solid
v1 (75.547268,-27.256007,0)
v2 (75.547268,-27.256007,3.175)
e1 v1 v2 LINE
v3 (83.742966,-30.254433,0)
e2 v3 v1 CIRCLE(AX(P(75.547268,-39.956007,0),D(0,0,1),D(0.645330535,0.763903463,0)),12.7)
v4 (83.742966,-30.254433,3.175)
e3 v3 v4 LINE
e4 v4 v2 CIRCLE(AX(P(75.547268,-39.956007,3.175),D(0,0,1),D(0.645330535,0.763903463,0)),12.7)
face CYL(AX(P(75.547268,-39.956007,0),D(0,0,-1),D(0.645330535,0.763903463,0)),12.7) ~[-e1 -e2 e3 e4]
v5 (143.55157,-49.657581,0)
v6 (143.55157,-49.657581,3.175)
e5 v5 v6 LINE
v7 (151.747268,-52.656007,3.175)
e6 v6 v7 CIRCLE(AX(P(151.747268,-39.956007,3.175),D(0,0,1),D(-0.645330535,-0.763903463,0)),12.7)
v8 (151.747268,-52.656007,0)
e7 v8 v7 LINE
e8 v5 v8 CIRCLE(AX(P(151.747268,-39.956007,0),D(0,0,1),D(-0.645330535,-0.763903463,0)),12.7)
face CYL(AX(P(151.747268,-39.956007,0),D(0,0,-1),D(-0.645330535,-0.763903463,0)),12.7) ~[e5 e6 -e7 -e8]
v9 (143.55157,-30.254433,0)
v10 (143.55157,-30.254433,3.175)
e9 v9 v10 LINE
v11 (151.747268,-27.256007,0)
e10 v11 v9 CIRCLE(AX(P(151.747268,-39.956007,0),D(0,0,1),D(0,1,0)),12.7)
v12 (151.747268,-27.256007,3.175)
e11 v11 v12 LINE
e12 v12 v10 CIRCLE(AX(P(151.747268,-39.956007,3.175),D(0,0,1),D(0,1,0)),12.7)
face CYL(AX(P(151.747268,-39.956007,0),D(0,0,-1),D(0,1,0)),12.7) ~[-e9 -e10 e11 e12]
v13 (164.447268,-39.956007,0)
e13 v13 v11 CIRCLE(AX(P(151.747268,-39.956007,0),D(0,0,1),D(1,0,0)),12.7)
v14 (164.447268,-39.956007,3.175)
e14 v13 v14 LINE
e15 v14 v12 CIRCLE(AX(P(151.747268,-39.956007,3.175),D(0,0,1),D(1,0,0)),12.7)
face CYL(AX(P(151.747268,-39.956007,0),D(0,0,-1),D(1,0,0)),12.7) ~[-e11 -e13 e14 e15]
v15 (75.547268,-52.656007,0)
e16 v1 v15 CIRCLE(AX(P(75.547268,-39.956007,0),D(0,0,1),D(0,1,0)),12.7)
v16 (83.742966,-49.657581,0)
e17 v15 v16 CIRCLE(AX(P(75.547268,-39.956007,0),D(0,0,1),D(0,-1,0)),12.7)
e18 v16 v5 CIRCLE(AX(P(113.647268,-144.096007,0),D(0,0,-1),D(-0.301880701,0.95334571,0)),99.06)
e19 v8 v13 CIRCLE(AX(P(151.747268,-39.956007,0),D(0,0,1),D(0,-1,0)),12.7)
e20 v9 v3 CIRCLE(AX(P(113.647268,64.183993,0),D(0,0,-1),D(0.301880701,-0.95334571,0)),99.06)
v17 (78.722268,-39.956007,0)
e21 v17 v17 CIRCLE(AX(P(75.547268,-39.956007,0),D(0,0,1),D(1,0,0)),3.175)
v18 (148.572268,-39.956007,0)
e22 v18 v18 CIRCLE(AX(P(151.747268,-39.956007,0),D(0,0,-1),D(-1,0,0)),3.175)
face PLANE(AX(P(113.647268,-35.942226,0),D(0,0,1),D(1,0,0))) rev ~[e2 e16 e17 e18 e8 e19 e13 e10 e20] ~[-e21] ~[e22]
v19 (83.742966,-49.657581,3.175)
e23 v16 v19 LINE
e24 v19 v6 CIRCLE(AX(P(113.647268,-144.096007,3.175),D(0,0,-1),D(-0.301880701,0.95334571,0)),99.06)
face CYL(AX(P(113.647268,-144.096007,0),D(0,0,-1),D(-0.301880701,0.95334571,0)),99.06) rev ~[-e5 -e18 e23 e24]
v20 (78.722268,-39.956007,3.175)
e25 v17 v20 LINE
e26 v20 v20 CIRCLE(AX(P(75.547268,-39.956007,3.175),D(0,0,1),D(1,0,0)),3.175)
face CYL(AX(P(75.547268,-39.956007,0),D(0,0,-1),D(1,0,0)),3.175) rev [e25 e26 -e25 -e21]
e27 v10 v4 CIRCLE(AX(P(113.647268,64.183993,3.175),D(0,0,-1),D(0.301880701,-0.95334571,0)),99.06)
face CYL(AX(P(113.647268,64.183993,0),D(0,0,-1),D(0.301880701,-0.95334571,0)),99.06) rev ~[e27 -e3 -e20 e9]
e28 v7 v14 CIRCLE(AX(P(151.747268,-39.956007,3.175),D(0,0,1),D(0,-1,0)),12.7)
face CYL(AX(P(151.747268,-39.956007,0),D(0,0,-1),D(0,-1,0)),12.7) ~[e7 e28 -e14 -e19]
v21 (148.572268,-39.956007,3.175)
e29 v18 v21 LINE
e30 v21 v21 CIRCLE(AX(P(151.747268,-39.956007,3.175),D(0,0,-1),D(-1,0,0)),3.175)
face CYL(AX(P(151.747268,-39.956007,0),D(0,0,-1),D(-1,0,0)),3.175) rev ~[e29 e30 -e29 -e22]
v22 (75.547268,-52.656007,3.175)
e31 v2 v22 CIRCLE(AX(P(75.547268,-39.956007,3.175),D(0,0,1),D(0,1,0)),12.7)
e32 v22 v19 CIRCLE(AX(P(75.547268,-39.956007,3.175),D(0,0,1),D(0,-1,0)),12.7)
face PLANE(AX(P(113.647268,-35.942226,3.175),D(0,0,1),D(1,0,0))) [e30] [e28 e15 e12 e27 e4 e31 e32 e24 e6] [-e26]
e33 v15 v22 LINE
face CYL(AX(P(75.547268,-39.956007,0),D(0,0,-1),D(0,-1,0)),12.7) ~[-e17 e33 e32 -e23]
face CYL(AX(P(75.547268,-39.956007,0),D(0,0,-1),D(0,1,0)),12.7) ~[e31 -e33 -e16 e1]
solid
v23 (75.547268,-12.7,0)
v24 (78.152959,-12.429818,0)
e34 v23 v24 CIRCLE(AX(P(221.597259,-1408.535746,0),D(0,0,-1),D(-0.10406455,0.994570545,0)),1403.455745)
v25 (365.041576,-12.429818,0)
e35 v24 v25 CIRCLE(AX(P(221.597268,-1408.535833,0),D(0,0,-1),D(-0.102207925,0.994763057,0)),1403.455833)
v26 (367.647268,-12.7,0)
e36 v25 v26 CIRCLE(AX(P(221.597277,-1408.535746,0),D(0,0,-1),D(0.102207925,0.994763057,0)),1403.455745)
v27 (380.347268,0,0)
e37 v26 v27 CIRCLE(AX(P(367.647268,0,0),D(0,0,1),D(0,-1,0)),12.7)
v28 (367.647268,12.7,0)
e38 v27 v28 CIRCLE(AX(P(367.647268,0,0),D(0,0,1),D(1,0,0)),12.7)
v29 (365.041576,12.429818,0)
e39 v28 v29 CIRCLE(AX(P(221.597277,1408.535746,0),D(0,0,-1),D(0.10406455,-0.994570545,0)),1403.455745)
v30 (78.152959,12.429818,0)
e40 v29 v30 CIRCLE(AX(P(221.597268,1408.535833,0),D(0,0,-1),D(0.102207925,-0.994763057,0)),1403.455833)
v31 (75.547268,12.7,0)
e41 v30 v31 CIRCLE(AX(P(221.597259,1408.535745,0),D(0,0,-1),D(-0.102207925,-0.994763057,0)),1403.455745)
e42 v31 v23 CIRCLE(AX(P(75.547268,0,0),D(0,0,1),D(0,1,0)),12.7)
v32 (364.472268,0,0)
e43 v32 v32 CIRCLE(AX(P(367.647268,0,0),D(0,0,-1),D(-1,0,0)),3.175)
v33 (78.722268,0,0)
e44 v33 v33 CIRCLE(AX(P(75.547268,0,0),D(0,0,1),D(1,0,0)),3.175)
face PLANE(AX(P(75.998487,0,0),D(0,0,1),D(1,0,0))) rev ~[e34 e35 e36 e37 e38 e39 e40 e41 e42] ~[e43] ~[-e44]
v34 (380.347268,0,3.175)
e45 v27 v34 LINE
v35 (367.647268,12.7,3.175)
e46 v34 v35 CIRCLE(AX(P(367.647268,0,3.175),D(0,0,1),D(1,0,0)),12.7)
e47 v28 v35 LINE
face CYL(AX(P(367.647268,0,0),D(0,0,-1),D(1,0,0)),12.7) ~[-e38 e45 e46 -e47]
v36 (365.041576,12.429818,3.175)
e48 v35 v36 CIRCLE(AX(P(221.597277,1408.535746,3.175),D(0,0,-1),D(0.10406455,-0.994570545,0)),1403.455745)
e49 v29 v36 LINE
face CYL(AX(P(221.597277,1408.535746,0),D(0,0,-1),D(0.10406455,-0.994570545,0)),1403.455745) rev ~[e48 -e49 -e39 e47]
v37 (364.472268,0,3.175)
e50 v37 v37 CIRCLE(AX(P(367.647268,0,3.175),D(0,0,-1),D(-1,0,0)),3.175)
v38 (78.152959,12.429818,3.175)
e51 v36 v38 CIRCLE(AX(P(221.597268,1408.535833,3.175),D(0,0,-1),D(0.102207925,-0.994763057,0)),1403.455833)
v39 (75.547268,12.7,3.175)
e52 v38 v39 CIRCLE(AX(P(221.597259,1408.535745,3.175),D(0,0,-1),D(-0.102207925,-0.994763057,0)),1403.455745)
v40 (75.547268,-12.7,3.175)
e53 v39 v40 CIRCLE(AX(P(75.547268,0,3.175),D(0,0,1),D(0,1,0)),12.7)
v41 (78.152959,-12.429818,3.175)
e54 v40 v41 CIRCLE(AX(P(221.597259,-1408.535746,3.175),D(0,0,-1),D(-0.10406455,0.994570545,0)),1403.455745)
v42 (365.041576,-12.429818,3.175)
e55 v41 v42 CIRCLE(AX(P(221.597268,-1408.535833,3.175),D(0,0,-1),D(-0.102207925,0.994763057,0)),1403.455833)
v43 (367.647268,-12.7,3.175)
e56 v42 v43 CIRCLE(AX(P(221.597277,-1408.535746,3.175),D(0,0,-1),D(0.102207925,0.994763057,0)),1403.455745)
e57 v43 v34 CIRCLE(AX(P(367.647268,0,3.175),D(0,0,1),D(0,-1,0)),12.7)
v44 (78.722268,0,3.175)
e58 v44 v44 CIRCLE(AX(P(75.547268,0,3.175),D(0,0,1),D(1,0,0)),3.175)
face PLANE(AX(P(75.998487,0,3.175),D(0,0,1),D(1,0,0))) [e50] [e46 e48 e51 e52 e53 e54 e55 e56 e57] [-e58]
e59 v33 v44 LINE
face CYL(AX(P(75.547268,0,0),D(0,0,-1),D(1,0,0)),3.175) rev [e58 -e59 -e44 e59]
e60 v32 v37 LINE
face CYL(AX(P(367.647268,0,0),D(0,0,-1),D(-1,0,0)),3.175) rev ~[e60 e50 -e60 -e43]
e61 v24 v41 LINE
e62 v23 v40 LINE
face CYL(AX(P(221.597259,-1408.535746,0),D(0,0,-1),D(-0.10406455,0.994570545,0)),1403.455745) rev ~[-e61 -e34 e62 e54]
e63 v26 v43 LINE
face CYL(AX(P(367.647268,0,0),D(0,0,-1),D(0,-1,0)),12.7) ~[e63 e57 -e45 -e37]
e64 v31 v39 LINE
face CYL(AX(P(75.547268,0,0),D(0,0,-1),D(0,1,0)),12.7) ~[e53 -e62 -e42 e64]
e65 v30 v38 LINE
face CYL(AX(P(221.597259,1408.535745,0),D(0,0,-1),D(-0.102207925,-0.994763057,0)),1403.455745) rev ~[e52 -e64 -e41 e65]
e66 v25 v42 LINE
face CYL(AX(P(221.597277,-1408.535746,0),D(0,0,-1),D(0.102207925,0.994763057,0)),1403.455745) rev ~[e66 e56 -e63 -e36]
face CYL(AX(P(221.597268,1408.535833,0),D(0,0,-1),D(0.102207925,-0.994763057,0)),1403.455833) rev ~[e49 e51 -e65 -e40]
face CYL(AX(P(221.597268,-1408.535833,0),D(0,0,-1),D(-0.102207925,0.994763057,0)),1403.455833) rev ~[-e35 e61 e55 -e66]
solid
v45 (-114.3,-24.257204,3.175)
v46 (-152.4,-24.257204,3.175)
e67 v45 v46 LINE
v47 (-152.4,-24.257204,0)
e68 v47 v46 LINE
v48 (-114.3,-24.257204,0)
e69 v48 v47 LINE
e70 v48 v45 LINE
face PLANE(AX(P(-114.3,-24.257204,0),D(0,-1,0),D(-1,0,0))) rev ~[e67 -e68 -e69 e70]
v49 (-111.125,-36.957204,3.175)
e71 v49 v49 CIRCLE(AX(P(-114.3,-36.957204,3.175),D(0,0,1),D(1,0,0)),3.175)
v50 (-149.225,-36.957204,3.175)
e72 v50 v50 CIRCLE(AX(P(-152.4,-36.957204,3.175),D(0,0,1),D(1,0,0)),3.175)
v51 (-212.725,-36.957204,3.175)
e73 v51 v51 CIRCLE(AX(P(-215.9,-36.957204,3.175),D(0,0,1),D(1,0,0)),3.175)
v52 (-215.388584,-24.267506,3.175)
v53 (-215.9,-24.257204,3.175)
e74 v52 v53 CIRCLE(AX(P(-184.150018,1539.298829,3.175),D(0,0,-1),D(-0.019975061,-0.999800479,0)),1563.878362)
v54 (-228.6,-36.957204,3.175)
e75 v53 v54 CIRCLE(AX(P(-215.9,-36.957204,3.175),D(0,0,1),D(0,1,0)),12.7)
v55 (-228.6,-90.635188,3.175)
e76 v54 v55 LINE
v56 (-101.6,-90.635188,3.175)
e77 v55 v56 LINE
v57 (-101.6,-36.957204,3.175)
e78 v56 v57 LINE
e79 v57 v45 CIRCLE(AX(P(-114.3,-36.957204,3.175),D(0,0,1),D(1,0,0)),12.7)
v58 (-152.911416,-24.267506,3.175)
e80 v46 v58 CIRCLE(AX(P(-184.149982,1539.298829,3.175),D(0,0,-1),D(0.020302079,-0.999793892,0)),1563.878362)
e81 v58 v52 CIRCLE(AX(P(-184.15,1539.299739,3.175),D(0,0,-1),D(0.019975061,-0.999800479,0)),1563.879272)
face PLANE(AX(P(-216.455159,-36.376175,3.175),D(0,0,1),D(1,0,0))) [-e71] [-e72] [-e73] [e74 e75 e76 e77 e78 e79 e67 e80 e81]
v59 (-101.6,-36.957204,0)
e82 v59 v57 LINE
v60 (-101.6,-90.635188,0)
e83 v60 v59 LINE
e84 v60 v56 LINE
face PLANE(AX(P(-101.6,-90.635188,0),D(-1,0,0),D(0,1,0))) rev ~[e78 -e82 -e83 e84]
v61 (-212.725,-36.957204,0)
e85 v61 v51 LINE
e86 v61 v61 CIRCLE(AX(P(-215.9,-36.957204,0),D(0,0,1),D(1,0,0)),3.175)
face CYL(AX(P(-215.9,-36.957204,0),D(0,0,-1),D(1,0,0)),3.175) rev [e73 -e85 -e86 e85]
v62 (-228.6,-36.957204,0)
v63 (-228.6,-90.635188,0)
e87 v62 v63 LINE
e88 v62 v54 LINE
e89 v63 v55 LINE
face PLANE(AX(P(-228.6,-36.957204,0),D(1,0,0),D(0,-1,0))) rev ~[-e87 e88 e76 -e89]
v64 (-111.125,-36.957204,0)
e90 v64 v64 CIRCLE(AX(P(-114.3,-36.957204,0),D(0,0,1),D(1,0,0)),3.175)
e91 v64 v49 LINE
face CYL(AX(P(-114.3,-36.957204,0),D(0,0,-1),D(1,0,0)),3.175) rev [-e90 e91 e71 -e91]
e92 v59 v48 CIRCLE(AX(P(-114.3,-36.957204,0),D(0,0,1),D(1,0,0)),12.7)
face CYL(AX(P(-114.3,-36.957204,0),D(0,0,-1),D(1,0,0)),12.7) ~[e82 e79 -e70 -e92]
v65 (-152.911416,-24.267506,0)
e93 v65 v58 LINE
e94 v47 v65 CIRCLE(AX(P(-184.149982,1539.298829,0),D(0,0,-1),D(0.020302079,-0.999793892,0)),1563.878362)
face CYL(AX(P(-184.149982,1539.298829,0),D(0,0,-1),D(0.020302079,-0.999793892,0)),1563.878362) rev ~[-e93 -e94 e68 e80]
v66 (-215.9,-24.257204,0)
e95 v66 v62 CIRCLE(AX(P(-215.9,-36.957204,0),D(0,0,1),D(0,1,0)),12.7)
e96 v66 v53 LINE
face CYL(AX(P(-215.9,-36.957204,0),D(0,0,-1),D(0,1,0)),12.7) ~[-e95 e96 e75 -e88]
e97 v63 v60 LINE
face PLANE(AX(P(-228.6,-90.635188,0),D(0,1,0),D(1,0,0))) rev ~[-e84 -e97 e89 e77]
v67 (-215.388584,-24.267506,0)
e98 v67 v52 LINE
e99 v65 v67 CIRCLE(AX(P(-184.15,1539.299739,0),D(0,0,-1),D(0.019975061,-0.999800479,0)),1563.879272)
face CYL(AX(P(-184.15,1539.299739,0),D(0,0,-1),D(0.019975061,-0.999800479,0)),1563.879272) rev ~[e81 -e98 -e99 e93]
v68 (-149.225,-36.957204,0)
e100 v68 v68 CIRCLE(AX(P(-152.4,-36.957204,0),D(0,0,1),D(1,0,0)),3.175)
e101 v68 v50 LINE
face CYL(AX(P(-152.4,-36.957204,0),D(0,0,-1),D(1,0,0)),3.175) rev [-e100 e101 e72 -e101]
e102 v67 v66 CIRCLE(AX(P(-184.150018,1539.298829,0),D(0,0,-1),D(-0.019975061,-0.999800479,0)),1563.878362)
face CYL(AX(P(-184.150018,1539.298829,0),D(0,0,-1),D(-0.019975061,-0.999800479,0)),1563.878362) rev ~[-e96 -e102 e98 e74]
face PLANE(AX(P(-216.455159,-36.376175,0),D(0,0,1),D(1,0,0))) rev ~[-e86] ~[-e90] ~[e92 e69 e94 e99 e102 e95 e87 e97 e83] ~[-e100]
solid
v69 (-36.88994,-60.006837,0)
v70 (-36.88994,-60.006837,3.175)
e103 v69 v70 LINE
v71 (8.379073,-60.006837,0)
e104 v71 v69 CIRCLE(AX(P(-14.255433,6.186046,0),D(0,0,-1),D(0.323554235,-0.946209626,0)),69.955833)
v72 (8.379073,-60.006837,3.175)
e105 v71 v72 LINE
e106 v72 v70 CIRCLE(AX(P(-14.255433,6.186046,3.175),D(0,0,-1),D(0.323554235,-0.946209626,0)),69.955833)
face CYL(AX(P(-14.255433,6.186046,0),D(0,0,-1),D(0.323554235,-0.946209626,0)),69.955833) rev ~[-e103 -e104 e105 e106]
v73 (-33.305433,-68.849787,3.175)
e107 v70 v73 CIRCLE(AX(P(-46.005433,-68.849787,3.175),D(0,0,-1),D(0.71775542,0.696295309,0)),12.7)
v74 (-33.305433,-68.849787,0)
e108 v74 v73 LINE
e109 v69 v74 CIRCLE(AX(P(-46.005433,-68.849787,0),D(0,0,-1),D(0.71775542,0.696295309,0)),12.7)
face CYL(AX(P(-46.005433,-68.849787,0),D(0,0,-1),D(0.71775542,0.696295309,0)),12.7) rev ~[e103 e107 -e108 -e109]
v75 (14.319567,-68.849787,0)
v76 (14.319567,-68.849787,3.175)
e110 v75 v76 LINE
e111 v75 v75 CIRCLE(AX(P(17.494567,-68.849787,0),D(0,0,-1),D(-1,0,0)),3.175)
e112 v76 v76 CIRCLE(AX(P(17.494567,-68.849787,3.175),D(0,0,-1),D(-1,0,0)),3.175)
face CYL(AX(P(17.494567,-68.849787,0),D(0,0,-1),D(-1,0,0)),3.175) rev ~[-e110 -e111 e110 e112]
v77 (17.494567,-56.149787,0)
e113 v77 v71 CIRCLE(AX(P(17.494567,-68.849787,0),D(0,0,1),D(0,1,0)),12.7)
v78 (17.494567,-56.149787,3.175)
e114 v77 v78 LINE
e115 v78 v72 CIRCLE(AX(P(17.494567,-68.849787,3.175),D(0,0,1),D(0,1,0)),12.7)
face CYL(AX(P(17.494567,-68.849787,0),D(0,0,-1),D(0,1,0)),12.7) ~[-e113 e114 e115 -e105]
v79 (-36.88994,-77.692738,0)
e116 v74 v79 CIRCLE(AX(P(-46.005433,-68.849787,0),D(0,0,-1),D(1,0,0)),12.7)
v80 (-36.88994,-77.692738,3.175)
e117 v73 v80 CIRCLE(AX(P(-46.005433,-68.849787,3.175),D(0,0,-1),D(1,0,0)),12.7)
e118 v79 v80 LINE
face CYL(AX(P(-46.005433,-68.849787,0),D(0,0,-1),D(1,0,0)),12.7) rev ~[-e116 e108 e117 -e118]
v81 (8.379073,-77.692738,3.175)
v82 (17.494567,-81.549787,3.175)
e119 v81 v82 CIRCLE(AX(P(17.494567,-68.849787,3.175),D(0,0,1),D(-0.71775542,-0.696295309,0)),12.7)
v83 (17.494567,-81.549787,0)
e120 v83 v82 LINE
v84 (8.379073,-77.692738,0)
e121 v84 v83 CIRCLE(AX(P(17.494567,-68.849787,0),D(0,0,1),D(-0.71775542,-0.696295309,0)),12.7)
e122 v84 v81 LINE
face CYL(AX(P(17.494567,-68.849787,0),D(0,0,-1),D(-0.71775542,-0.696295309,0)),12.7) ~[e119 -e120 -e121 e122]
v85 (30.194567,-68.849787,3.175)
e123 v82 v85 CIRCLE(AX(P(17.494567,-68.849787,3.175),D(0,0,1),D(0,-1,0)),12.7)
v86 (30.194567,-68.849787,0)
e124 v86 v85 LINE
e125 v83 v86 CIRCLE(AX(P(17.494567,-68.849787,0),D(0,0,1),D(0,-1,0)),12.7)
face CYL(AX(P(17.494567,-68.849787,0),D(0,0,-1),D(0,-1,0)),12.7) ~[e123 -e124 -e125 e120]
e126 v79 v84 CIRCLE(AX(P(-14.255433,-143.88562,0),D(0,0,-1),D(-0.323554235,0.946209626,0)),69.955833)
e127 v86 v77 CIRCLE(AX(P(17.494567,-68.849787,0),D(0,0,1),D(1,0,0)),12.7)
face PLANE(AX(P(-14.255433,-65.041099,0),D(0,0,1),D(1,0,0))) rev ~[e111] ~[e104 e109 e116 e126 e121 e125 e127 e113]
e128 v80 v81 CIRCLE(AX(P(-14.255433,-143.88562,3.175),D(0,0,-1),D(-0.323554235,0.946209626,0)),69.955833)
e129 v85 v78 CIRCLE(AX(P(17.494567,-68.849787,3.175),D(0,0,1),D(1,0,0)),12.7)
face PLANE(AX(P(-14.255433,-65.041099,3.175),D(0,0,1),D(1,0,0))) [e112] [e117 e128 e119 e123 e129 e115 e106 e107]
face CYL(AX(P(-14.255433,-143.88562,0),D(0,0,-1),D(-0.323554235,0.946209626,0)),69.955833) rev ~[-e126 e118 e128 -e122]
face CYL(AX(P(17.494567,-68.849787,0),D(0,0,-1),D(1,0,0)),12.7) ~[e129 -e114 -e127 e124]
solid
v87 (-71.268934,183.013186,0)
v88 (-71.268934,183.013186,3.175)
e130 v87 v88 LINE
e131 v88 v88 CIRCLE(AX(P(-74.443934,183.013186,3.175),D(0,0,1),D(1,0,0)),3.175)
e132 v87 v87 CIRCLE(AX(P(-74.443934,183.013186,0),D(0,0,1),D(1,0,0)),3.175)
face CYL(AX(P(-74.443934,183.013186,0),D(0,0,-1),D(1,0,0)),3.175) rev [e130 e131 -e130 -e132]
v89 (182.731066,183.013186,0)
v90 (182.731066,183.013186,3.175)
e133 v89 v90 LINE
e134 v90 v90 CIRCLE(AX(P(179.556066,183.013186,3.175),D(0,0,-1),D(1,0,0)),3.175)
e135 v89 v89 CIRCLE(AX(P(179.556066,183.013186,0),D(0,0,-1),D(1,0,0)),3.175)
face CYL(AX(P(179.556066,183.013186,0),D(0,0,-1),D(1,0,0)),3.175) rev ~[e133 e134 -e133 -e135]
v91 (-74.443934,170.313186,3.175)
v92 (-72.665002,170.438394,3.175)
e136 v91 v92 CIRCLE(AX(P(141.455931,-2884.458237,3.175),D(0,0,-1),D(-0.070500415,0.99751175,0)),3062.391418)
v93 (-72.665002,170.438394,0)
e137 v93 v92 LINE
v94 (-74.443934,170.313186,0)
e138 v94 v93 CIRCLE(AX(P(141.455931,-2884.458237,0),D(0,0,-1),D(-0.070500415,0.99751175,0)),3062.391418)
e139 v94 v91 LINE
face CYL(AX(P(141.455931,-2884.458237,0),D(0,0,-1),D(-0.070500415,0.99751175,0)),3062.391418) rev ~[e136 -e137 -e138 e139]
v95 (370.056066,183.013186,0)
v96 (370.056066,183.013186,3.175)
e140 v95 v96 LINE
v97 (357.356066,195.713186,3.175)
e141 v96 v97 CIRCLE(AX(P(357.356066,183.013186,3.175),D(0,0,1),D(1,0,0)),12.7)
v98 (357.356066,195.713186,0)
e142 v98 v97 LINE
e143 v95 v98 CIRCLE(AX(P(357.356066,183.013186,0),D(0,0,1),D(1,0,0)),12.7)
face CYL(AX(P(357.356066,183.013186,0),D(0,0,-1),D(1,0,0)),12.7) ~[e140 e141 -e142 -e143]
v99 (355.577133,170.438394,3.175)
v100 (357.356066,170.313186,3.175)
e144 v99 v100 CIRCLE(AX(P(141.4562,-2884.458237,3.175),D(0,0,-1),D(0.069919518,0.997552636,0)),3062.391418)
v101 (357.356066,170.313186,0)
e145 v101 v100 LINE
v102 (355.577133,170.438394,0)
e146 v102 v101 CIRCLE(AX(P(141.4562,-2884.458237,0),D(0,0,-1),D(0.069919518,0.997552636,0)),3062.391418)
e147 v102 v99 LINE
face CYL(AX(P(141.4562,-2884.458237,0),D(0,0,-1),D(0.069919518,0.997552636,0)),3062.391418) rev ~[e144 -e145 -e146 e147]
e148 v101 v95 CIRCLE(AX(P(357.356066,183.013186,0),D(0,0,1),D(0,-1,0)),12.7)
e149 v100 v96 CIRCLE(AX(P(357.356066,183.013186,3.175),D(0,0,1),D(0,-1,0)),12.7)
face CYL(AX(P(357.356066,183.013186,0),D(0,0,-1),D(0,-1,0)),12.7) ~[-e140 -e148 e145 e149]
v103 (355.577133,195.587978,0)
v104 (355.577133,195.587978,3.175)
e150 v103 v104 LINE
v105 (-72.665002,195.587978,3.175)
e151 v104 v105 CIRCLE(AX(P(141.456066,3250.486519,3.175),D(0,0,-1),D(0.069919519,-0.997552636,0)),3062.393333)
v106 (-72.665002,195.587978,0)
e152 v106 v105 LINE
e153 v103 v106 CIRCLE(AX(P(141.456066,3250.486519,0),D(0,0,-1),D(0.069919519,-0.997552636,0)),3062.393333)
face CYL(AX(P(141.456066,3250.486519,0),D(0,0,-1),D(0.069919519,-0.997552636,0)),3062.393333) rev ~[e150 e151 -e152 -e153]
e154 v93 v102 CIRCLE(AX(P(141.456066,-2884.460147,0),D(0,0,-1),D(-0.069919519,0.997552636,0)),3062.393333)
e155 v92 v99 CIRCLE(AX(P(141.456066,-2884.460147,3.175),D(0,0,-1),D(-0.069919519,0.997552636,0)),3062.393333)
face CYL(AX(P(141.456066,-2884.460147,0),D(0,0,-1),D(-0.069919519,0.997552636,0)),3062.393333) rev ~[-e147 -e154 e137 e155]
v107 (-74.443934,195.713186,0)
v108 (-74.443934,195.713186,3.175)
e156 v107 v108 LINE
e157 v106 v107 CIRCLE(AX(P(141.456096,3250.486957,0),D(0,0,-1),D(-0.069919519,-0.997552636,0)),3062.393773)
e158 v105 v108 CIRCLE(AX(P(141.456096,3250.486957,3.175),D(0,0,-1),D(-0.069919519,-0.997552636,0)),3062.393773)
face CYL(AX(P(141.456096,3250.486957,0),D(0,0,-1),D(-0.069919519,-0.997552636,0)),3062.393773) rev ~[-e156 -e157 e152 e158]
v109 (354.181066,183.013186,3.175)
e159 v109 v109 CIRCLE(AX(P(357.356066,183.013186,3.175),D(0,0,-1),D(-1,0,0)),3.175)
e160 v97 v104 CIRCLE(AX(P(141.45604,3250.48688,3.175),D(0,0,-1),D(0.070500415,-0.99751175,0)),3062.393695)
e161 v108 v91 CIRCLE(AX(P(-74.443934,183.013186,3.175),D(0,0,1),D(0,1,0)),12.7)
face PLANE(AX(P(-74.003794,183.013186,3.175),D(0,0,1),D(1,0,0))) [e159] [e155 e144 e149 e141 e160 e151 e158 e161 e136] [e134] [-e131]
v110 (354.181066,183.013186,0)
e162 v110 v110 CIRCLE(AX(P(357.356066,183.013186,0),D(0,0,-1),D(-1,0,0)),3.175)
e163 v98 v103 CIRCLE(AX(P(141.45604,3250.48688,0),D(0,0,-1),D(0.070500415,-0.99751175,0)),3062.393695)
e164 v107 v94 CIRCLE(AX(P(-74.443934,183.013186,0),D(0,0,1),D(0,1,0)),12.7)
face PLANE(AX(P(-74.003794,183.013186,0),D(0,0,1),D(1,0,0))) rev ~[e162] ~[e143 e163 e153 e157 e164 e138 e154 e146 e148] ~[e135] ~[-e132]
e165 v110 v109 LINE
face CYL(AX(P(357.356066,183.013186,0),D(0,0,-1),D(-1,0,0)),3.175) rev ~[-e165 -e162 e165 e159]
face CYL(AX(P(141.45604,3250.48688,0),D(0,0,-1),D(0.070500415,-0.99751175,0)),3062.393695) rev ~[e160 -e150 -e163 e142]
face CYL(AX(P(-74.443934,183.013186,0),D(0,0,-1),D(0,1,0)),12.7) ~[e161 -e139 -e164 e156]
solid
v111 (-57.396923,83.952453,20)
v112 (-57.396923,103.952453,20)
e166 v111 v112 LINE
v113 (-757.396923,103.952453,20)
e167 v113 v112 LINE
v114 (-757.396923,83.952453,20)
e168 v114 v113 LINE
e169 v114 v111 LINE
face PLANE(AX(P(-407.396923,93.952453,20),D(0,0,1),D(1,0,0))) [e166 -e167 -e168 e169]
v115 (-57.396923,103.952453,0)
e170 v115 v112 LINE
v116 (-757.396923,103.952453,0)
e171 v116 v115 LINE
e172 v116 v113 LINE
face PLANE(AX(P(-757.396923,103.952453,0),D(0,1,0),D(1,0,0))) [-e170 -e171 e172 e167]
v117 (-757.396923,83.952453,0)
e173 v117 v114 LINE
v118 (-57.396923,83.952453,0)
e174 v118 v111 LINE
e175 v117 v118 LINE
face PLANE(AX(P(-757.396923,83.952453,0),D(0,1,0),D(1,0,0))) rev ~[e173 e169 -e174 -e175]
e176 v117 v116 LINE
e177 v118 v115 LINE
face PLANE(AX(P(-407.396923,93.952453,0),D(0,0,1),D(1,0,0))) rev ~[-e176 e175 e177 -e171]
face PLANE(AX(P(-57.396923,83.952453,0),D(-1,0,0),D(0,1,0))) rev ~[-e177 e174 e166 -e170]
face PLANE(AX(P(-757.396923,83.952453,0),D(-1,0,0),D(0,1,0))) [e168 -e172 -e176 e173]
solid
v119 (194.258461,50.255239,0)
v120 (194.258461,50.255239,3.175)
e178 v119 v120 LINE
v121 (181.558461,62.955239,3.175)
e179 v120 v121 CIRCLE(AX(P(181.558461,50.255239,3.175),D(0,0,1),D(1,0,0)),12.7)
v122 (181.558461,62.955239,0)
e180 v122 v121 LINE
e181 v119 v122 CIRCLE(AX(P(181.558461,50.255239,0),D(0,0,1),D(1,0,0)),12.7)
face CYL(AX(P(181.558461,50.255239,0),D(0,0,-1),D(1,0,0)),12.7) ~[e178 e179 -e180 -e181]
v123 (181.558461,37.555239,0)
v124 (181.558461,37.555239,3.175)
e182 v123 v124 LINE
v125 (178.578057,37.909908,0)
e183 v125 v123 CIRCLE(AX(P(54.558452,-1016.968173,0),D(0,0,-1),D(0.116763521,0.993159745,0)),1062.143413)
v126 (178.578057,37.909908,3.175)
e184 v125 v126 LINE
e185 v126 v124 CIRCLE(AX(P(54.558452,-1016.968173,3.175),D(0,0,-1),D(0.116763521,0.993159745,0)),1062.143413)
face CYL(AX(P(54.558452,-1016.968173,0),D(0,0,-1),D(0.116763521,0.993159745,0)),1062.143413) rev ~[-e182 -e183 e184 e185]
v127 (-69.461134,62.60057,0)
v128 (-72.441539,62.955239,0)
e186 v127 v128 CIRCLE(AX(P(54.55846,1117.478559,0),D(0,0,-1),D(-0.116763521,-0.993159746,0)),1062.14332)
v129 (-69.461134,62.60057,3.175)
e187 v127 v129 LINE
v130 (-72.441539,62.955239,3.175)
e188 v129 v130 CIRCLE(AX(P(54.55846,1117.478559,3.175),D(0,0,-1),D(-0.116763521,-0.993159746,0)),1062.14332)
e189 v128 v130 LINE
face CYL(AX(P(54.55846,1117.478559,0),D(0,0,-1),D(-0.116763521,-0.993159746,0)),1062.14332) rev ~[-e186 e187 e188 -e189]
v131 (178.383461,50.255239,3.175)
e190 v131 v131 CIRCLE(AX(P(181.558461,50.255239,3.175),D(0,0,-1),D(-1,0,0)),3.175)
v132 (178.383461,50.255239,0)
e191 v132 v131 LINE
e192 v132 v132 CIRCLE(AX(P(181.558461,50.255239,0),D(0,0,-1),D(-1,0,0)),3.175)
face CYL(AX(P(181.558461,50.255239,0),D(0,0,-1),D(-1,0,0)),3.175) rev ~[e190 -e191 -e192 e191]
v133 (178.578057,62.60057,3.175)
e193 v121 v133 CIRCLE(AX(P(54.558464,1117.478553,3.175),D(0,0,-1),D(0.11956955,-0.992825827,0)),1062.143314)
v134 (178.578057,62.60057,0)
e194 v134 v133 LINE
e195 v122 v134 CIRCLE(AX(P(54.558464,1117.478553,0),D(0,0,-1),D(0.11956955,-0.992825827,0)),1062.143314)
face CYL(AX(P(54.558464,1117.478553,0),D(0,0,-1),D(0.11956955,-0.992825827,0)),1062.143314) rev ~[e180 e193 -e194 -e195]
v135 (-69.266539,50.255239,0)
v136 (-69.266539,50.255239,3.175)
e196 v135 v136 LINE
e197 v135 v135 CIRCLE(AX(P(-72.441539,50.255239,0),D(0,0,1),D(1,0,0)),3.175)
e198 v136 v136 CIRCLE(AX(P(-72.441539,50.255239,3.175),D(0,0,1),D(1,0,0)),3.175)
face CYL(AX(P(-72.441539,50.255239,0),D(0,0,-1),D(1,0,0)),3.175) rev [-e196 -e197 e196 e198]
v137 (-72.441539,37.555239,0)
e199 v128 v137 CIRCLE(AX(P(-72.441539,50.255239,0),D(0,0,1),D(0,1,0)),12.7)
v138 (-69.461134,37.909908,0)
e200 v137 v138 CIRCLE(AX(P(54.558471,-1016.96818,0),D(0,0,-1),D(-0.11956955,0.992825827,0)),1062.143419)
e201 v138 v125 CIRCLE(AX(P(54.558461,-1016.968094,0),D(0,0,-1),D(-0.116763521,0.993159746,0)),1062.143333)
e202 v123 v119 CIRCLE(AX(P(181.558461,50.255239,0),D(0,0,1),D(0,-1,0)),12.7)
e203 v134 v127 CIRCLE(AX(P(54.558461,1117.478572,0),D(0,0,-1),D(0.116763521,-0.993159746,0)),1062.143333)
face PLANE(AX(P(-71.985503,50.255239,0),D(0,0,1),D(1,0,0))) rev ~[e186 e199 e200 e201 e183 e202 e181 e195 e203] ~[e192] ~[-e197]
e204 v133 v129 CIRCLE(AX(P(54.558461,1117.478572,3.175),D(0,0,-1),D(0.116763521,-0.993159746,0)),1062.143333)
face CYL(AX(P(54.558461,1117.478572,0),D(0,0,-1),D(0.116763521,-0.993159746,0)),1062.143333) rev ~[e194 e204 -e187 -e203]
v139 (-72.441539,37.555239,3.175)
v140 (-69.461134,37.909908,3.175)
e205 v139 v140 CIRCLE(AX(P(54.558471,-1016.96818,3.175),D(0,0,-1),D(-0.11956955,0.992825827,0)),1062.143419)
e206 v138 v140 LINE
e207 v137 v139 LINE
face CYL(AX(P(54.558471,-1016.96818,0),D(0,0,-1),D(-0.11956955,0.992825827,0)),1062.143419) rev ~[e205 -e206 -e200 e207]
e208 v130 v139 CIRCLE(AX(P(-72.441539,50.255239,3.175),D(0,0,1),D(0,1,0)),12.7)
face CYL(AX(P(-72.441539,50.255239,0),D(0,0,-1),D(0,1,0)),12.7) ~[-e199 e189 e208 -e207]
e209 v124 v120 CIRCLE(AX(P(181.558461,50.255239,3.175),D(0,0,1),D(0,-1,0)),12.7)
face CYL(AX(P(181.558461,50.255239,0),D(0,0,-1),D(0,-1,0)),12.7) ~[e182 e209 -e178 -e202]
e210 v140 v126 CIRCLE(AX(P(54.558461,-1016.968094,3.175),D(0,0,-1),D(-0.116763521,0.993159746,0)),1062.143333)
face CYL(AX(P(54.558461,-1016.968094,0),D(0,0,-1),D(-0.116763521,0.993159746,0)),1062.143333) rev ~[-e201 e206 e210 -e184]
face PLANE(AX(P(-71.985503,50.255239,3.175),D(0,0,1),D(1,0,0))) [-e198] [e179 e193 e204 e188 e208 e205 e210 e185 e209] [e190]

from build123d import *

# Parameters (mm, degrees)
F1_R      = 3.175
F7_DEPTH  = 3.175
F2_R      = 3.175
F8_DEPTH  = 3.175
F9_DEPTH  = 3.175
F6_R      = 3.175
F10_DEPTH = 3.175
F3_R      = 3.175
F11_DEPTH = 3.175
F4_R      = 3.175
F12_DEPTH = 3.175
F0_W      = 700
F0_H      = 20
F13_DEPTH = 20


# Not quite as in the source:
# - a feature names something its author has since deleted; it is built from what else it names


with BuildPart() as f7:
    # F1 (on Top) → F7 (new body)
    with BuildSketch(Plane.XY):
        with BuildLine():
            ThreePointArc((78.1529593822, 12.4298178438), (76.8500505757, 12.5643009555), (75.5472678483, 12.7))
            ThreePointArc((75.5472678483, 12.7), (62.8472678483, 0), (75.5472678483, -12.7))
            ThreePointArc((75.5472678483, -12.7), (76.8500505757, -12.5643009555), (78.1529593822, -12.4298178438))
            ThreePointArc((78.1529593822, -12.4298178438), (85.4058246007, -8.0061762883), (88.2472678483, 0))
            ThreePointArc((88.2472678483, 0), (85.4058246007, 8.0061762883), (78.1529593822, 12.4298178438))
        make_face()
        with Locations((75.5472678483, 0)):
            Circle(F1_R, mode=Mode.SUBTRACT)
        with BuildLine():
            ThreePointArc((365.0415763144, 12.4298178438), (221.5972678483, 5.08), (78.1529593822, 12.4298178438))
            ThreePointArc((78.1529593822, 12.4298178438), (85.4058246007, 8.0061762883), (88.2472678483, 0))
            Line((88.2472678483, 0), (354.9472678483, 0))
            ThreePointArc((354.9472678483, 0), (357.7887110959, 8.0061762883), (365.0415763144, 12.4298178438))
        make_face()
        with BuildLine():
            ThreePointArc((88.2472678483, 0), (85.4058246007, -8.0061762883), (78.1529593822, -12.4298178438))
            ThreePointArc((78.1529593822, -12.4298178438), (221.5972678483, -5.08), (365.0415763144, -12.4298178438))
            ThreePointArc((365.0415763144, -12.4298178438), (357.7887110959, -8.0061762883), (354.9472678483, 0))
            Line((354.9472678483, 0), (88.2472678483, 0))
        make_face()
        with BuildLine():
            ThreePointArc((367.6472678483, 12.7), (366.3444851209, 12.5643009555), (365.0415763144, 12.4298178438))
            ThreePointArc((365.0415763144, 12.4298178438), (357.7887110959, 8.0061762883), (354.9472678483, 0))
            ThreePointArc((354.9472678483, 0), (357.7887110959, -8.0061762883), (365.0415763144, -12.4298178438))
            ThreePointArc((365.0415763144, -12.4298178438), (366.3444851209, -12.5643009555), (367.6472678483, -12.7))
            ThreePointArc((367.6472678483, -12.7), (376.6275239694, -8.9802561211), (380.3472678483, 0))
            ThreePointArc((380.3472678483, 0), (376.6275239694, 8.9802561211), (367.6472678483, 12.7))
        make_face()
        with BuildLine():
            ThreePointArc((370.8222678483, 0), (367.6472678483, -3.175), (364.4722678483, 0))
            ThreePointArc((364.4722678483, 0), (367.6472678483, 3.175), (370.8222678483, 0))
        make_face(mode=Mode.SUBTRACT)
    extrude(amount=F7_DEPTH)


with BuildPart() as f8:
    # F2 (on Top) → F8 (new body)
    with BuildSketch(Plane.XY):
        with BuildLine():
            ThreePointArc((143.5515700519, -30.2544331759), (113.6472678483, -34.8760071528), (83.7429656448, -30.2544331759))
            ThreePointArc((83.7429656448, -30.2544331759), (87.0662817387, -34.6078935608), (88.2472678483, -39.9560071528))
            Line((88.2472678483, -39.9560071528), (139.0472678483, -39.9560071528))
            ThreePointArc((139.0472678483, -39.9560071528), (140.2282539579, -34.6078935608), (143.5515700519, -30.2544331759))
        make_face()
        with BuildLine():
            ThreePointArc((151.7472678483, -27.2560071528), (147.6824543353, -28.8455168838), (143.5515700519, -30.2544331759))
            ThreePointArc((143.5515700519, -30.2544331759), (140.2282539579, -34.6078935608), (139.0472678483, -39.9560071528))
            ThreePointArc((139.0472678483, -39.9560071528), (140.2282539579, -45.3041207448), (143.5515700519, -49.6575811297))
            ThreePointArc((143.5515700519, -49.6575811297), (147.6824543353, -51.0664974218), (151.7472678483, -52.6560071528))
            ThreePointArc((151.7472678483, -52.6560071528), (160.7275239694, -48.9362632739), (164.4472678483, -39.9560071528))
            ThreePointArc((164.4472678483, -39.9560071528), (160.7275239694, -30.9757510317), (151.7472678483, -27.2560071528))
        make_face()
        with BuildLine():
            ThreePointArc((154.9222678483, -39.9560071528), (151.7472678483, -43.1310071528), (148.5722678483, -39.9560071528))
            ThreePointArc((148.5722678483, -39.9560071528), (151.7472678483, -36.7810071528), (154.9222678483, -39.9560071528))
        make_face(mode=Mode.SUBTRACT)
        with BuildLine():
            ThreePointArc((88.2472678483, -39.9560071528), (87.0662817387, -45.3041207448), (83.7429656448, -49.6575811297))
            ThreePointArc((83.7429656448, -49.6575811297), (113.6472678483, -45.0360071528), (143.5515700519, -49.6575811297))
            ThreePointArc((143.5515700519, -49.6575811297), (140.2282539579, -45.3041207448), (139.0472678483, -39.9560071528))
            Line((139.0472678483, -39.9560071528), (88.2472678483, -39.9560071528))
        make_face()
        with BuildLine():
            ThreePointArc((83.7429656448, -49.6575811297), (79.6120813614, -51.0664974218), (75.5472678483, -52.6560071528))
            ThreePointArc((75.5472678483, -52.6560071528), (79.9107532954, -51.8828673747), (83.7429656448, -49.6575811297))
        make_face()
        with BuildLine():
            ThreePointArc((151.7472678483, -52.6560071528), (147.6824543353, -51.0664974218), (143.5515700519, -49.6575811297))
            ThreePointArc((143.5515700519, -49.6575811297), (147.3837824013, -51.8828673747), (151.7472678483, -52.6560071528))
        make_face()
        with BuildLine():
            ThreePointArc((83.7429656448, -30.2544331759), (79.6120813614, -28.8455168838), (75.5472678483, -27.2560071528))
            ThreePointArc((75.5472678483, -27.2560071528), (62.8472678483, -39.9560071528), (75.5472678483, -52.6560071528))
            ThreePointArc((75.5472678483, -52.6560071528), (79.6120813614, -51.0664974218), (83.7429656448, -49.6575811297))
            ThreePointArc((83.7429656448, -49.6575811297), (87.0662817387, -45.3041207448), (88.2472678483, -39.9560071528))
            ThreePointArc((88.2472678483, -39.9560071528), (87.0662817387, -34.6078935608), (83.7429656448, -30.2544331759))
        make_face()
        with Locations((75.5472678483, -39.9560071528)):
            Circle(F2_R, mode=Mode.SUBTRACT)
        with BuildLine():
            ThreePointArc((83.7429656448, -30.2544331759), (79.9107532954, -28.0291469309), (75.5472678483, -27.2560071528))
            ThreePointArc((75.5472678483, -27.2560071528), (79.6120813614, -28.8455168838), (83.7429656448, -30.2544331759))
        make_face()
        with BuildLine():
            ThreePointArc((151.7472678483, -27.2560071528), (147.3837824013, -28.0291469309), (143.5515700519, -30.2544331759))
            ThreePointArc((143.5515700519, -30.2544331759), (147.6824543353, -28.8455168838), (151.7472678483, -27.2560071528))
        make_face()
    extrude(amount=F8_DEPTH)


with BuildPart() as f9:
    # F5 (on Top) → F9 (new body)
    with BuildSketch(Plane.XY):
        with BuildLine():
            ThreePointArc((8.3790727633, -60.0068366925), (-14.2554334044, -63.7697871161), (-36.8899395722, -60.0068366925))
            ThreePointArc((-36.8899395722, -60.0068366925), (-34.2356251717, -64.078873769), (-33.3054334044, -68.8497871161))
            Line((-33.3054334044, -68.8497871161), (4.7945665956, -68.8497871161))
            ThreePointArc((4.7945665956, -68.8497871161), (5.7247583628, -64.078873769), (8.3790727633, -60.0068366925))
        make_face()
        with BuildLine():
            ThreePointArc((-33.3054334044, -68.8497871161), (-34.2356251717, -73.6207004631), (-36.8899395722, -77.6927375396))
            ThreePointArc((-36.8899395722, -77.6927375396), (-14.2554334044, -73.9297871161), (8.3790727633, -77.6927375396))
            ThreePointArc((8.3790727633, -77.6927375396), (5.7247583628, -73.6207004631), (4.7945665956, -68.8497871161))
            Line((4.7945665956, -68.8497871161), (-33.3054334044, -68.8497871161))
        make_face()
        with BuildLine():
            ThreePointArc((17.4945665956, -56.1497871161), (13.0051211687, -58.2397310906), (8.3790727633, -60.0068366925))
            ThreePointArc((8.3790727633, -60.0068366925), (5.7247583628, -64.078873769), (4.7945665956, -68.8497871161))
            ThreePointArc((4.7945665956, -68.8497871161), (5.7247583628, -73.6207004631), (8.3790727633, -77.6927375396))
            ThreePointArc((8.3790727633, -77.6927375396), (13.0051211687, -79.4598431415), (17.4945665956, -81.5497871161))
            ThreePointArc((17.4945665956, -81.5497871161), (26.4748227166, -77.8300432371), (30.1945665956, -68.8497871161))
            ThreePointArc((30.1945665956, -68.8497871161), (26.4748227166, -59.869530995), (17.4945665956, -56.1497871161))
        make_face()
        with BuildLine():
            ThreePointArc((20.6695665956, -68.8497871161), (17.4945665956, -72.0247871161), (14.3195665956, -68.8497871161))
            ThreePointArc((14.3195665956, -68.8497871161), (17.4945665956, -65.6747871161), (20.6695665956, -68.8497871161))
        make_face(mode=Mode.SUBTRACT)
        with BuildLine():
            ThreePointArc((17.4945665956, -56.1497871161), (12.5456005611, -57.1537307213), (8.3790727633, -60.0068366925))
            ThreePointArc((8.3790727633, -60.0068366925), (13.0051211687, -58.2397310906), (17.4945665956, -56.1497871161))
        make_face()
        with BuildLine():
            ThreePointArc((17.4945665956, -81.5497871161), (13.0051211687, -79.4598431415), (8.3790727633, -77.6927375396))
            ThreePointArc((8.3790727633, -77.6927375396), (12.5456005611, -80.5458435108), (17.4945665956, -81.5497871161))
        make_face()
    extrude(amount=F9_DEPTH)


with BuildPart() as f10:
    # F6 (on Top) → F10 (new body)
    with BuildSketch(Plane.XY):
        with BuildLine():
            ThreePointArc((-215.3885840548, -24.2675056169), (-215.6442924486, -24.2623758889), (-215.9, -24.2572043419))
            ThreePointArc((-215.9, -24.2572043419), (-224.8802561211, -27.9769482208), (-228.6, -36.9572043419))
            ThreePointArc((-228.6, -36.9572043419), (-215.9, -49.6572043419), (-203.2, -36.9572043419))
            ThreePointArc((-203.2, -36.9572043419), (-206.740715571, -28.1596189488), (-215.3885840548, -24.2675056169))
        make_face()
        with Locations((-215.9, -36.9572043419)):
            Circle(F6_R, mode=Mode.SUBTRACT)
        with BuildLine():
            ThreePointArc((-203.2, -36.9572043419), (-215.9, -49.6572043419), (-228.6, -36.9572043419))
            Line((-228.6, -36.9572043419), (-228.6, -90.6351879239))
            Line((-228.6, -90.6351879239), (-101.6, -90.6351879239))
            Line((-101.6, -90.6351879239), (-101.6, -36.9572043419))
            ThreePointArc((-101.6, -36.9572043419), (-123.2802561211, -45.937460463), (-114.3, -24.2572043419))
            Line((-114.3, -24.2572043419), (-152.4, -24.2572043419))
            ThreePointArc((-152.4, -24.2572043419), (-143.4197438789, -27.9769482208), (-139.7, -36.9572043419))
            ThreePointArc((-139.7, -36.9572043419), (-161.197585393, -46.1164887709), (-152.9114159452, -24.2675056169))
            ThreePointArc((-152.9114159452, -24.2675056169), (-184.15, -24.579533058), (-215.3885840548, -24.2675056169))
            ThreePointArc((-215.3885840548, -24.2675056169), (-206.740715571, -28.1596189488), (-203.2, -36.9572043419))
        make_face()
        with BuildLine():
            ThreePointArc((-152.4, -24.2572043419), (-152.6557075514, -24.2623758889), (-152.9114159452, -24.2675056169))
            ThreePointArc((-152.9114159452, -24.2675056169), (-161.197585393, -46.1164887709), (-139.7, -36.9572043419))
            ThreePointArc((-139.7, -36.9572043419), (-143.4197438789, -27.9769482208), (-152.4, -24.2572043419))
        make_face()
        with Locations((-152.4, -36.9572043419)):
            Circle(F6_R, mode=Mode.SUBTRACT)
        with BuildLine():
            ThreePointArc((-114.3, -24.2572043419), (-123.2802561211, -45.937460463), (-101.6, -36.9572043419))
            ThreePointArc((-101.6, -36.9572043419), (-105.3197438789, -27.9769482208), (-114.3, -24.2572043419))
        make_face()
        with Locations((-114.3, -36.9572043419)):
            Circle(F6_R, mode=Mode.SUBTRACT)
    extrude(amount=F10_DEPTH)


with BuildPart() as f11:
    # F3 (on Top) → F11 (new body)
    with BuildSketch(Plane.XY):
        with BuildLine():
            ThreePointArc((-69.4611344861, 62.6005697173), (-70.9514619098, 62.7768515998), (-72.441538775, 62.9552390099))
            ThreePointArc((-72.441538775, 62.9552390099), (-85.141538775, 50.2552390099), (-72.441538775, 37.5552390099))
            ThreePointArc((-72.441538775, 37.5552390099), (-70.9514619098, 37.7336264199), (-69.4611344861, 37.9099083025))
            ThreePointArc((-69.4611344861, 37.9099083025), (-62.4630335144, 42.3990673744), (-59.741538775, 50.2552390099))
            ThreePointArc((-59.741538775, 50.2552390099), (-62.4630335144, 58.1114106453), (-69.4611344861, 62.6005697173))
        make_face()
        with Locations((-72.441538775, 50.2552390099)):
            Circle(F3_R, mode=Mode.SUBTRACT)
        with BuildLine():
            ThreePointArc((178.5780569362, 62.6005697173), (54.558461225, 55.3352390099), (-69.4611344861, 62.6005697173))
            ThreePointArc((-69.4611344861, 62.6005697173), (-62.4630335144, 58.1114106453), (-59.741538775, 50.2552390099))
            Line((-59.741538775, 50.2552390099), (168.858461225, 50.2552390099))
            ThreePointArc((168.858461225, 50.2552390099), (171.5799559645, 58.1114106453), (178.5780569362, 62.6005697173))
        make_face()
        with BuildLine():
            ThreePointArc((-59.741538775, 50.2552390099), (-62.4630335144, 42.3990673744), (-69.4611344861, 37.9099083025))
            ThreePointArc((-69.4611344861, 37.9099083025), (54.558461225, 45.1752390099), (178.5780569362, 37.9099083025))
            ThreePointArc((178.5780569362, 37.9099083025), (171.5799559645, 42.3990673744), (168.858461225, 50.2552390099))
            Line((168.858461225, 50.2552390099), (-59.741538775, 50.2552390099))
        make_face()
        with BuildLine():
            ThreePointArc((181.558461225, 62.9552390099), (180.0683843599, 62.7768515998), (178.5780569362, 62.6005697173))
            ThreePointArc((178.5780569362, 62.6005697173), (171.5799559645, 58.1114106453), (168.858461225, 50.2552390099))
            ThreePointArc((168.858461225, 50.2552390099), (171.5799559645, 42.3990673744), (178.5780569362, 37.9099083025))
            ThreePointArc((178.5780569362, 37.9099083025), (180.0683843599, 37.7336264199), (181.558461225, 37.5552390099))
            ThreePointArc((181.558461225, 37.5552390099), (190.5387173461, 41.2749828888), (194.258461225, 50.2552390099))
            ThreePointArc((194.258461225, 50.2552390099), (190.5387173461, 59.2354951309), (181.558461225, 62.9552390099))
        make_face()
        with BuildLine():
            ThreePointArc((184.733461225, 50.2552390099), (181.558461225, 47.0802390099), (178.383461225, 50.2552390099))
            ThreePointArc((178.383461225, 50.2552390099), (181.558461225, 53.4302390099), (184.733461225, 50.2552390099))
        make_face(mode=Mode.SUBTRACT)
    extrude(amount=F11_DEPTH)


with BuildPart() as f12:
    # F4 (on Top) → F12 (new body)
    with BuildSketch(Plane.XY):
        with BuildLine():
            ThreePointArc((-72.6650020829, 195.5879780869), (-73.5544773878, 195.6504524814), (-74.4439344645, 195.7131858587))
            ThreePointArc((-74.4439344645, 195.7131858587), (-87.1439344645, 183.0131858587), (-74.4439344645, 170.3131858587))
            ThreePointArc((-74.4439344645, 170.3131858587), (-73.5544773878, 170.3759192361), (-72.6650020829, 170.4383936305))
            ThreePointArc((-72.6650020829, 170.4383936305), (-64.8553359943, 174.6855944076), (-61.7439344645, 183.0131858587))
            ThreePointArc((-61.7439344645, 183.0131858587), (-64.8553359943, 191.3407773099), (-72.6650020829, 195.5879780869))
        make_face()
        with Locations((-74.4439344645, 183.0131858587)):
            Circle(F4_R, mode=Mode.SUBTRACT)
        with BuildLine():
            ThreePointArc((355.577133154, 195.5879780869), (141.4560655355, 188.0931858587), (-72.6650020829, 195.5879780869))
            ThreePointArc((-72.6650020829, 195.5879780869), (-64.8553359943, 191.3407773099), (-61.7439344645, 183.0131858587))
            Line((-61.7439344645, 183.0131858587), (176.3810655355, 183.0131858587))
            ThreePointArc((176.3810655355, 183.0131858587), (179.5560655355, 186.1881858587), (182.7310655355, 183.0131858587))
            Line((182.7310655355, 183.0131858587), (344.6560655355, 183.0131858587))
            ThreePointArc((344.6560655355, 183.0131858587), (347.7674670654, 191.3407773099), (355.577133154, 195.5879780869))
        make_face()
        with BuildLine():
            ThreePointArc((-61.7439344645, 183.0131858587), (-64.8553359943, 174.6855944076), (-72.6650020829, 170.4383936305))
            ThreePointArc((-72.6650020829, 170.4383936305), (141.4560655356, 177.9331858587), (355.5771331541, 170.4383936305))
            ThreePointArc((355.5771331541, 170.4383936305), (347.7674670654, 174.6855944076), (344.6560655355, 183.0131858587))
            Line((344.6560655355, 183.0131858587), (182.7310655355, 183.0131858587))
            ThreePointArc((182.7310655355, 183.0131858587), (179.5560655355, 179.8381858587), (176.3810655355, 183.0131858587))
            Line((176.3810655355, 183.0131858587), (-61.7439344645, 183.0131858587))
        make_face()
        with BuildLine():
            ThreePointArc((357.3560655355, 195.7131858587), (356.4666084589, 195.6504524814), (355.577133154, 195.5879780869))
            ThreePointArc((355.577133154, 195.5879780869), (347.7674670654, 191.3407773099), (344.6560655355, 183.0131858587))
            ThreePointArc((344.6560655355, 183.0131858587), (347.7674670654, 174.6855944076), (355.5771331541, 170.4383936305))
            ThreePointArc((355.5771331541, 170.4383936305), (356.4666084589, 170.3759192361), (357.3560655355, 170.3131858587))
            ThreePointArc((357.3560655355, 170.3131858587), (366.3363216566, 174.0329297377), (370.0560655355, 183.0131858587))
            ThreePointArc((370.0560655355, 183.0131858587), (366.3363216566, 191.9934419798), (357.3560655355, 195.7131858587))
        make_face()
        with BuildLine():
            ThreePointArc((360.5310655355, 183.0131858587), (357.3560655355, 179.8381858587), (354.1810655355, 183.0131858587))
            ThreePointArc((354.1810655355, 183.0131858587), (357.3560655355, 186.1881858587), (360.5310655355, 183.0131858587))
        make_face(mode=Mode.SUBTRACT)
    extrude(amount=F12_DEPTH)


with BuildPart() as f13:
    # F0 (on Top) → F13 (new body)
    with BuildSketch(Plane.XY):
        with Locations((-407.3969234348, 93.9524527639)):
            Rectangle(F0_W, F0_H)
    extrude(amount=F13_DEPTH)


solid = Compound([f7.part, f8.part, f9.part, f10.part, f11.part, f12.part, f13.part])
